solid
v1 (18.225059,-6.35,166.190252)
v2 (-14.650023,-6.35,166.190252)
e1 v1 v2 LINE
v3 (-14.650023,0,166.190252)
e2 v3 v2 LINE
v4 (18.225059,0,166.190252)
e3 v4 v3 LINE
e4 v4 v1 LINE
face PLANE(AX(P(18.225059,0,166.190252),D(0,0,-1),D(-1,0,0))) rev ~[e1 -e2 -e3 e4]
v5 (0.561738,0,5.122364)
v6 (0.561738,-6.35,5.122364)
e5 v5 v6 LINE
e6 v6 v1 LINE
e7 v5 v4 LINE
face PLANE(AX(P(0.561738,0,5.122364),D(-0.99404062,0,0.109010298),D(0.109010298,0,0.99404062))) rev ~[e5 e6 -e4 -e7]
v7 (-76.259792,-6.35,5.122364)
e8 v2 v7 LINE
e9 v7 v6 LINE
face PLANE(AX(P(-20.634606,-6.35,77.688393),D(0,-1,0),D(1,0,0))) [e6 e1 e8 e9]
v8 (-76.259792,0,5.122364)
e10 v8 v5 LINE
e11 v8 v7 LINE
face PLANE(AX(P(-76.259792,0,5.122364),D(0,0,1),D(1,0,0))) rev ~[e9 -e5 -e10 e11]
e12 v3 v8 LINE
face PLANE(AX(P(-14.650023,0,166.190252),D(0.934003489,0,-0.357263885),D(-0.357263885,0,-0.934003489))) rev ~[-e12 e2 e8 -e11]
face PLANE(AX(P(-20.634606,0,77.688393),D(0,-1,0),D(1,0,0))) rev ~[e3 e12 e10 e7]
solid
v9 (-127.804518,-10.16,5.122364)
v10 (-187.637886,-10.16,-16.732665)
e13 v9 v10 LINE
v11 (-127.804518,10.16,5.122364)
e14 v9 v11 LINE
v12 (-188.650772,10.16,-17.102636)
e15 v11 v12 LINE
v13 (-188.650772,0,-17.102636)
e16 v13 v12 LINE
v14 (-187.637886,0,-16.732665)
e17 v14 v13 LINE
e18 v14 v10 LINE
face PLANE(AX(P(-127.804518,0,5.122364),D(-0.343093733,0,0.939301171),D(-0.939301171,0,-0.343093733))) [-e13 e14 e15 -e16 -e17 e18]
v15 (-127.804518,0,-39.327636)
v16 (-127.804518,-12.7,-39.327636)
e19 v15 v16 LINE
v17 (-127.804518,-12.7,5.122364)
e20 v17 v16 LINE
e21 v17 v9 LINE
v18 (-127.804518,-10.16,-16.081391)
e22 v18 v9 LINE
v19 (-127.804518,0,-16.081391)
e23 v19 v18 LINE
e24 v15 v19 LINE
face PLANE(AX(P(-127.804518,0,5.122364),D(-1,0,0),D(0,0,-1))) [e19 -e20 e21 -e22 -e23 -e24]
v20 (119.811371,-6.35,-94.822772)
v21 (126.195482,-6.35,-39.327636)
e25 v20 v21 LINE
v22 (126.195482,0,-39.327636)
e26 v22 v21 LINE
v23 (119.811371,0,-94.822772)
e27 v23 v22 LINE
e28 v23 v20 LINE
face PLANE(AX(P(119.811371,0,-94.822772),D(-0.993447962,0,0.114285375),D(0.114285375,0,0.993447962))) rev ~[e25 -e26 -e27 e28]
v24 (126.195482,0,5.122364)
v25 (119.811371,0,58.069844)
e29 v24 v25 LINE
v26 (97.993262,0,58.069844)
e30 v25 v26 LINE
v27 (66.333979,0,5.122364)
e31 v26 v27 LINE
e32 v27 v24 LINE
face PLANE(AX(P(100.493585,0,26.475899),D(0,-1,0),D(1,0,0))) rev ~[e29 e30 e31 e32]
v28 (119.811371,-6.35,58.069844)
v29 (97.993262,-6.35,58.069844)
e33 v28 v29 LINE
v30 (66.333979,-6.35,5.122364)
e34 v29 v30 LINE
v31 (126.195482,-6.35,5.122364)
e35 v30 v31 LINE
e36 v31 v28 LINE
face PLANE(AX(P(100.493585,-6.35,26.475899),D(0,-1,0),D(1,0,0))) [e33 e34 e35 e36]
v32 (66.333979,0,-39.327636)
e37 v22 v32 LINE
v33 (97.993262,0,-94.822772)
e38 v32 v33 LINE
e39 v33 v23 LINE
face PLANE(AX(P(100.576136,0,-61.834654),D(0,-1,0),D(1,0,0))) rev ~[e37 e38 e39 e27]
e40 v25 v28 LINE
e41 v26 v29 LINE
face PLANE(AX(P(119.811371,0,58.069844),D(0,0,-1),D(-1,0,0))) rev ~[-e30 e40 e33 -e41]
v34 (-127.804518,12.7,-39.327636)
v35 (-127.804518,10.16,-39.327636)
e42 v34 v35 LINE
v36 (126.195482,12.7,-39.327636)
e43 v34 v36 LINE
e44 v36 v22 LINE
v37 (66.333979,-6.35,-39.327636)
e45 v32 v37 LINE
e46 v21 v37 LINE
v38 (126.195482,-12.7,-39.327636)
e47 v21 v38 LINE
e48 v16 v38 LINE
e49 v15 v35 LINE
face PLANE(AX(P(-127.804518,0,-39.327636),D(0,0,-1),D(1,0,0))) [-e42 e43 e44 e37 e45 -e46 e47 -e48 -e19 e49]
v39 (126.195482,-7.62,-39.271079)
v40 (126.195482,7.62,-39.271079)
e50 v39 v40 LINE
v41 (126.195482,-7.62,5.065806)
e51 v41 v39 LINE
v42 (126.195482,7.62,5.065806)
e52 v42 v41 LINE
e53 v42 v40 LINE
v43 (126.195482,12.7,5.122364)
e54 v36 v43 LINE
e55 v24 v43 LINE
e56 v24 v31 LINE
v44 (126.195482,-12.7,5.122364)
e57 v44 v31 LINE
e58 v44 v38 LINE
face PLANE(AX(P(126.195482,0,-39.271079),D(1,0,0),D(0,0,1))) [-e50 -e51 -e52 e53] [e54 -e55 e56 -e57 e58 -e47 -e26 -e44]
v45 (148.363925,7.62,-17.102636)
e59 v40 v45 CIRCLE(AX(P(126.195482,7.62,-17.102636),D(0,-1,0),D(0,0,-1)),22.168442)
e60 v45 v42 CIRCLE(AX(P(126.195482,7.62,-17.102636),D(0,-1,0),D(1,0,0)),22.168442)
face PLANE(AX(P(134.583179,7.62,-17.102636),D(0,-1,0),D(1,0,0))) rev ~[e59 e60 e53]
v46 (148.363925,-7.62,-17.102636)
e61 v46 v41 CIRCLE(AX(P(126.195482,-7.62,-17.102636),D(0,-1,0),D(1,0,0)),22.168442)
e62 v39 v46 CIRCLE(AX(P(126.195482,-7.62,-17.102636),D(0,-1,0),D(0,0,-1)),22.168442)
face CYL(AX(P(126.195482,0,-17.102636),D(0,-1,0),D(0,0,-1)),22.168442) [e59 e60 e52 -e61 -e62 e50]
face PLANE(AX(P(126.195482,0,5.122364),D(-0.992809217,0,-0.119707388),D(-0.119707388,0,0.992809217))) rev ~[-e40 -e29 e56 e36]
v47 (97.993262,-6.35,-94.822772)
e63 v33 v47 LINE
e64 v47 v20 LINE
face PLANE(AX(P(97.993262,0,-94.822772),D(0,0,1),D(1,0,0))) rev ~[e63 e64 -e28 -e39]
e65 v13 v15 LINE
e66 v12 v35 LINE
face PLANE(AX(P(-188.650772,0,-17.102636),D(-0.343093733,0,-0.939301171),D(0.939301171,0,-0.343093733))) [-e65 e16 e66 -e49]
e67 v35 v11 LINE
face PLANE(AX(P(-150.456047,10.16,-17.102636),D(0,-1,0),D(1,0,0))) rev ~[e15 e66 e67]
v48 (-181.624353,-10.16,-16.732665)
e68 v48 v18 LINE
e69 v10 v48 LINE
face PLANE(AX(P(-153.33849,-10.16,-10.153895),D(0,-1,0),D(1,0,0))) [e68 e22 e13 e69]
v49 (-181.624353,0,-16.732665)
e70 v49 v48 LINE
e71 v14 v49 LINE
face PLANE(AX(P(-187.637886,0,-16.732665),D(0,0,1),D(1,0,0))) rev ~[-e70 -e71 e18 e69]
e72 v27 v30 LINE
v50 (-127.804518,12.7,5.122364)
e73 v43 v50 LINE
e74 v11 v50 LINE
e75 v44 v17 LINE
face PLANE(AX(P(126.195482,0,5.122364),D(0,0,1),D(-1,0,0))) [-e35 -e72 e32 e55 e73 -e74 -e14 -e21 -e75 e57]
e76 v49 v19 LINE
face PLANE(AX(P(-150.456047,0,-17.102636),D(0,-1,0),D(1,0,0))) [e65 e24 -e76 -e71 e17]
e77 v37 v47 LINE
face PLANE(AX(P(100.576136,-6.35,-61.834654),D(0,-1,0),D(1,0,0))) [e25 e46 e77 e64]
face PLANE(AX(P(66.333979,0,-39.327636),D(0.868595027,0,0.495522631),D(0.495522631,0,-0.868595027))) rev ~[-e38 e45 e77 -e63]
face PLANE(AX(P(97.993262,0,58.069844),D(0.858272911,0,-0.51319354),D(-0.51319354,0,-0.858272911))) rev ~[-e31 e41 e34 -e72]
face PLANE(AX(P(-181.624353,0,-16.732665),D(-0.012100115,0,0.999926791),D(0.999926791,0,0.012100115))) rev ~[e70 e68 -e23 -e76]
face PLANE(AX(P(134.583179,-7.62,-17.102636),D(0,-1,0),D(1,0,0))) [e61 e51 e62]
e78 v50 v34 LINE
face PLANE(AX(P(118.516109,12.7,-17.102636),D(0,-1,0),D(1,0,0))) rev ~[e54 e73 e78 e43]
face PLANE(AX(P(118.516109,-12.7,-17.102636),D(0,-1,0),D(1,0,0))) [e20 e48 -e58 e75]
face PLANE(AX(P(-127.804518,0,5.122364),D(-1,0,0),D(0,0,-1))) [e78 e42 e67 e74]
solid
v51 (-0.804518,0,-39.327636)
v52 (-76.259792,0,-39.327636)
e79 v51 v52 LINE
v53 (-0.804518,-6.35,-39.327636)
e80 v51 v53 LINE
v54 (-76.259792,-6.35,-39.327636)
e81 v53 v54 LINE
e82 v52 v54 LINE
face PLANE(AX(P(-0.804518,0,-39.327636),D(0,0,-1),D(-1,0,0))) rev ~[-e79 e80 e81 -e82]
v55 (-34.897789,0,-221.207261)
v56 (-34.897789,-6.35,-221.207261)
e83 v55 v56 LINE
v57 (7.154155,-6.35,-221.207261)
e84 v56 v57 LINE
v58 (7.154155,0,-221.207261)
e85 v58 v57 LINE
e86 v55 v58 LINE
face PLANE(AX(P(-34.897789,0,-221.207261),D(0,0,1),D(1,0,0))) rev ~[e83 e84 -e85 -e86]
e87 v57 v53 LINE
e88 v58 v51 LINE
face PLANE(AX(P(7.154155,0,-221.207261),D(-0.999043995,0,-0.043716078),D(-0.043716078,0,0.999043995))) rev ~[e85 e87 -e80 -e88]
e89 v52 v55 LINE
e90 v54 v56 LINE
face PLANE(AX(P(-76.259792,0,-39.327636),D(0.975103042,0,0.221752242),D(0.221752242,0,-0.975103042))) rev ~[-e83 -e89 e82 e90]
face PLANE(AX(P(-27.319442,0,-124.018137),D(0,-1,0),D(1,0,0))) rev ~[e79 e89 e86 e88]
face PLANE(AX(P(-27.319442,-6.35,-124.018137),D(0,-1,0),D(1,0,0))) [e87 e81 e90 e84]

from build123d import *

# Parameters (mm, degrees)
F1_DEPTH  = 6.35
F2_DEPTH  = 6.35
F3_DEPTH  = 12.7
F4_DEPTH  = 12.7
F5_DEPTH  = 6.35
F6_DEPTH  = 6.35
F7_DEPTH  = 12.7
F8_DEPTH  = 12.7
F9_DEPTH  = 7.62
F10_DEPTH = 7.62
F12_DEPTH = 10.16
F13_DEPTH = 10.16


with BuildPart() as f1:
    # F0 (on Front) → F1 (new body)
    with BuildSketch(Plane.XZ):
        Polygon((-14.650022611, 166.190251708), (-76.259791851, 5.1223636389), (0.5617379969, 5.1223636389), (18.2250589132, 166.190251708), align=None)
    extrude(amount=F1_DEPTH)


with BuildPart() as f2:
    # F0 (on Front) → F2 (new body)
    with BuildSketch(Plane.XZ):
        Polygon((-0.804517746, -39.3276363611), (-76.259791851, -39.3276363611), (-34.8977893591, -221.2072610855), (7.1541545913, -221.2072610855), align=None)
    extrude(amount=F2_DEPTH)


with BuildPart() as f3:
    # F0 (on Front) → F3 (new body)
    with BuildSketch(Plane.XZ):
        with BuildLine():
            Line((-127.804517746, 5.1223636389), (-127.804517746, -39.3276363611))
            Line((-127.804517746, -39.3276363611), (-76.259791851, -39.3276363611))
            Line((-76.259791851, -39.3276363611), (-0.804517746, -39.3276363611))
            Line((-0.804517746, -39.3276363611), (66.3339793682, -39.3276363611))
            Line((66.3339793682, -39.3276363611), (126.195482254, -39.3276363611))
            Line((126.195482254, -39.3276363611), (126.195482254, -39.2710786657))
            ThreePointArc((126.195482254, -39.2710786657), (104.0270399495, -17.1026363611), (126.195482254, 5.0658059434))
            Line((126.195482254, 5.0658059434), (126.195482254, 5.1223636389))
            Line((126.195482254, 5.1223636389), (66.3339793682, 5.1223636389))
            Line((66.3339793682, 5.1223636389), (0.5617379969, 5.1223636389))
            Line((0.5617379969, 5.1223636389), (-76.259791851, 5.1223636389))
            Line((-76.259791851, 5.1223636389), (-127.804517746, 5.1223636389))
        make_face()
    extrude(amount=F3_DEPTH)

    # F0 (on Front) → F4 (join)
    with BuildSketch(Plane.XZ):
        with BuildLine():
            Line((-127.804517746, 5.1223636389), (-127.804517746, -39.3276363611))
            Line((-127.804517746, -39.3276363611), (-76.259791851, -39.3276363611))
            Line((-76.259791851, -39.3276363611), (-0.804517746, -39.3276363611))
            Line((-0.804517746, -39.3276363611), (66.3339793682, -39.3276363611))
            Line((66.3339793682, -39.3276363611), (126.195482254, -39.3276363611))
            Line((126.195482254, -39.3276363611), (126.195482254, -39.2710786657))
            ThreePointArc((126.195482254, -39.2710786657), (104.0270399495, -17.1026363611), (126.195482254, 5.0658059434))
            Line((126.195482254, 5.0658059434), (126.195482254, 5.1223636389))
            Line((126.195482254, 5.1223636389), (66.3339793682, 5.1223636389))
            Line((66.3339793682, 5.1223636389), (0.5617379969, 5.1223636389))
            Line((0.5617379969, 5.1223636389), (-76.259791851, 5.1223636389))
            Line((-76.259791851, 5.1223636389), (-127.804517746, 5.1223636389))
        make_face()
    extrude(amount=-F4_DEPTH)

    # F0 (on Front) → F5 (join)
    with BuildSketch(Plane.XZ):
        Polygon((126.195482254, -39.3276363611), (66.3339793682, -39.3276363611), (97.9932621121, -94.8227718472), (119.8113709688, -94.8227718472), align=None)
    extrude(amount=F5_DEPTH)

    # F0 (on Front) → F6 (join)
    with BuildSketch(Plane.XZ):
        Polygon((97.9932621121, 58.0698437989), (66.3339793682, 5.1223636389), (126.195482254, 5.1223636389), (119.8113709688, 58.0698437989), align=None)
    extrude(amount=F6_DEPTH)

    # F0 (on Front) → F7 (join)
    with BuildSketch(Plane.XZ):
        with BuildLine():
            ThreePointArc((126.195482254, 5.0658059434), (104.0270399495, -17.1026363611), (126.195482254, -39.2710786657))
            Line((126.195482254, -39.2710786657), (126.195482254, 5.0658059434))
        make_face()
    extrude(amount=F7_DEPTH)

    # F0 (on Front) → F8 (join)
    with BuildSketch(Plane.XZ):
        with BuildLine():
            ThreePointArc((126.195482254, 5.0658059434), (104.0270399495, -17.1026363611), (126.195482254, -39.2710786657))
            Line((126.195482254, -39.2710786657), (126.195482254, 5.0658059434))
        make_face()
    extrude(amount=-F8_DEPTH)

    # F0 (on Front) → F9 (join)
    with BuildSketch(Plane.XZ):
        with BuildLine():
            Line((126.195482254, 5.0658059434), (126.195482254, -39.2710786657))
            ThreePointArc((126.195482254, -39.2710786657), (141.8709381359, -32.778092243), (148.3639245586, -17.1026363611))
            ThreePointArc((148.3639245586, -17.1026363611), (141.8709381359, -1.4271804792), (126.195482254, 5.0658059434))
        make_face()
    extrude(amount=F9_DEPTH)

    # F0 (on Front) → F10 (join)
    with BuildSketch(Plane.XZ):
        with BuildLine():
            Line((126.195482254, 5.0658059434), (126.195482254, -39.2710786657))
            ThreePointArc((126.195482254, -39.2710786657), (141.8709381359, -32.778092243), (148.3639245586, -17.1026363611))
            ThreePointArc((148.3639245586, -17.1026363611), (141.8709381359, -1.4271804792), (126.195482254, 5.0658059434))
        make_face()
    extrude(amount=-F10_DEPTH)

    # F11 (on face) → F12 (join)
    with BuildSketch(Plane.XZ):
        Polygon((-127.804517746, 5.1223636389), (-187.6378862633, -16.7326647788), (-181.624352932, -16.7326647788), (-127.804517746, -16.0813909283), align=None)
    extrude(amount=F12_DEPTH)

    # F0 (on Front) → F13 (join)
    with BuildSketch(Plane.XZ):
        Polygon((-188.6507719755, -17.1026363611), (-127.804517746, -39.3276363611), (-127.804517746, 5.1223636389), align=None)
    extrude(amount=-F13_DEPTH)


solid = Compound([f1.part, f2.part, f3.part])
